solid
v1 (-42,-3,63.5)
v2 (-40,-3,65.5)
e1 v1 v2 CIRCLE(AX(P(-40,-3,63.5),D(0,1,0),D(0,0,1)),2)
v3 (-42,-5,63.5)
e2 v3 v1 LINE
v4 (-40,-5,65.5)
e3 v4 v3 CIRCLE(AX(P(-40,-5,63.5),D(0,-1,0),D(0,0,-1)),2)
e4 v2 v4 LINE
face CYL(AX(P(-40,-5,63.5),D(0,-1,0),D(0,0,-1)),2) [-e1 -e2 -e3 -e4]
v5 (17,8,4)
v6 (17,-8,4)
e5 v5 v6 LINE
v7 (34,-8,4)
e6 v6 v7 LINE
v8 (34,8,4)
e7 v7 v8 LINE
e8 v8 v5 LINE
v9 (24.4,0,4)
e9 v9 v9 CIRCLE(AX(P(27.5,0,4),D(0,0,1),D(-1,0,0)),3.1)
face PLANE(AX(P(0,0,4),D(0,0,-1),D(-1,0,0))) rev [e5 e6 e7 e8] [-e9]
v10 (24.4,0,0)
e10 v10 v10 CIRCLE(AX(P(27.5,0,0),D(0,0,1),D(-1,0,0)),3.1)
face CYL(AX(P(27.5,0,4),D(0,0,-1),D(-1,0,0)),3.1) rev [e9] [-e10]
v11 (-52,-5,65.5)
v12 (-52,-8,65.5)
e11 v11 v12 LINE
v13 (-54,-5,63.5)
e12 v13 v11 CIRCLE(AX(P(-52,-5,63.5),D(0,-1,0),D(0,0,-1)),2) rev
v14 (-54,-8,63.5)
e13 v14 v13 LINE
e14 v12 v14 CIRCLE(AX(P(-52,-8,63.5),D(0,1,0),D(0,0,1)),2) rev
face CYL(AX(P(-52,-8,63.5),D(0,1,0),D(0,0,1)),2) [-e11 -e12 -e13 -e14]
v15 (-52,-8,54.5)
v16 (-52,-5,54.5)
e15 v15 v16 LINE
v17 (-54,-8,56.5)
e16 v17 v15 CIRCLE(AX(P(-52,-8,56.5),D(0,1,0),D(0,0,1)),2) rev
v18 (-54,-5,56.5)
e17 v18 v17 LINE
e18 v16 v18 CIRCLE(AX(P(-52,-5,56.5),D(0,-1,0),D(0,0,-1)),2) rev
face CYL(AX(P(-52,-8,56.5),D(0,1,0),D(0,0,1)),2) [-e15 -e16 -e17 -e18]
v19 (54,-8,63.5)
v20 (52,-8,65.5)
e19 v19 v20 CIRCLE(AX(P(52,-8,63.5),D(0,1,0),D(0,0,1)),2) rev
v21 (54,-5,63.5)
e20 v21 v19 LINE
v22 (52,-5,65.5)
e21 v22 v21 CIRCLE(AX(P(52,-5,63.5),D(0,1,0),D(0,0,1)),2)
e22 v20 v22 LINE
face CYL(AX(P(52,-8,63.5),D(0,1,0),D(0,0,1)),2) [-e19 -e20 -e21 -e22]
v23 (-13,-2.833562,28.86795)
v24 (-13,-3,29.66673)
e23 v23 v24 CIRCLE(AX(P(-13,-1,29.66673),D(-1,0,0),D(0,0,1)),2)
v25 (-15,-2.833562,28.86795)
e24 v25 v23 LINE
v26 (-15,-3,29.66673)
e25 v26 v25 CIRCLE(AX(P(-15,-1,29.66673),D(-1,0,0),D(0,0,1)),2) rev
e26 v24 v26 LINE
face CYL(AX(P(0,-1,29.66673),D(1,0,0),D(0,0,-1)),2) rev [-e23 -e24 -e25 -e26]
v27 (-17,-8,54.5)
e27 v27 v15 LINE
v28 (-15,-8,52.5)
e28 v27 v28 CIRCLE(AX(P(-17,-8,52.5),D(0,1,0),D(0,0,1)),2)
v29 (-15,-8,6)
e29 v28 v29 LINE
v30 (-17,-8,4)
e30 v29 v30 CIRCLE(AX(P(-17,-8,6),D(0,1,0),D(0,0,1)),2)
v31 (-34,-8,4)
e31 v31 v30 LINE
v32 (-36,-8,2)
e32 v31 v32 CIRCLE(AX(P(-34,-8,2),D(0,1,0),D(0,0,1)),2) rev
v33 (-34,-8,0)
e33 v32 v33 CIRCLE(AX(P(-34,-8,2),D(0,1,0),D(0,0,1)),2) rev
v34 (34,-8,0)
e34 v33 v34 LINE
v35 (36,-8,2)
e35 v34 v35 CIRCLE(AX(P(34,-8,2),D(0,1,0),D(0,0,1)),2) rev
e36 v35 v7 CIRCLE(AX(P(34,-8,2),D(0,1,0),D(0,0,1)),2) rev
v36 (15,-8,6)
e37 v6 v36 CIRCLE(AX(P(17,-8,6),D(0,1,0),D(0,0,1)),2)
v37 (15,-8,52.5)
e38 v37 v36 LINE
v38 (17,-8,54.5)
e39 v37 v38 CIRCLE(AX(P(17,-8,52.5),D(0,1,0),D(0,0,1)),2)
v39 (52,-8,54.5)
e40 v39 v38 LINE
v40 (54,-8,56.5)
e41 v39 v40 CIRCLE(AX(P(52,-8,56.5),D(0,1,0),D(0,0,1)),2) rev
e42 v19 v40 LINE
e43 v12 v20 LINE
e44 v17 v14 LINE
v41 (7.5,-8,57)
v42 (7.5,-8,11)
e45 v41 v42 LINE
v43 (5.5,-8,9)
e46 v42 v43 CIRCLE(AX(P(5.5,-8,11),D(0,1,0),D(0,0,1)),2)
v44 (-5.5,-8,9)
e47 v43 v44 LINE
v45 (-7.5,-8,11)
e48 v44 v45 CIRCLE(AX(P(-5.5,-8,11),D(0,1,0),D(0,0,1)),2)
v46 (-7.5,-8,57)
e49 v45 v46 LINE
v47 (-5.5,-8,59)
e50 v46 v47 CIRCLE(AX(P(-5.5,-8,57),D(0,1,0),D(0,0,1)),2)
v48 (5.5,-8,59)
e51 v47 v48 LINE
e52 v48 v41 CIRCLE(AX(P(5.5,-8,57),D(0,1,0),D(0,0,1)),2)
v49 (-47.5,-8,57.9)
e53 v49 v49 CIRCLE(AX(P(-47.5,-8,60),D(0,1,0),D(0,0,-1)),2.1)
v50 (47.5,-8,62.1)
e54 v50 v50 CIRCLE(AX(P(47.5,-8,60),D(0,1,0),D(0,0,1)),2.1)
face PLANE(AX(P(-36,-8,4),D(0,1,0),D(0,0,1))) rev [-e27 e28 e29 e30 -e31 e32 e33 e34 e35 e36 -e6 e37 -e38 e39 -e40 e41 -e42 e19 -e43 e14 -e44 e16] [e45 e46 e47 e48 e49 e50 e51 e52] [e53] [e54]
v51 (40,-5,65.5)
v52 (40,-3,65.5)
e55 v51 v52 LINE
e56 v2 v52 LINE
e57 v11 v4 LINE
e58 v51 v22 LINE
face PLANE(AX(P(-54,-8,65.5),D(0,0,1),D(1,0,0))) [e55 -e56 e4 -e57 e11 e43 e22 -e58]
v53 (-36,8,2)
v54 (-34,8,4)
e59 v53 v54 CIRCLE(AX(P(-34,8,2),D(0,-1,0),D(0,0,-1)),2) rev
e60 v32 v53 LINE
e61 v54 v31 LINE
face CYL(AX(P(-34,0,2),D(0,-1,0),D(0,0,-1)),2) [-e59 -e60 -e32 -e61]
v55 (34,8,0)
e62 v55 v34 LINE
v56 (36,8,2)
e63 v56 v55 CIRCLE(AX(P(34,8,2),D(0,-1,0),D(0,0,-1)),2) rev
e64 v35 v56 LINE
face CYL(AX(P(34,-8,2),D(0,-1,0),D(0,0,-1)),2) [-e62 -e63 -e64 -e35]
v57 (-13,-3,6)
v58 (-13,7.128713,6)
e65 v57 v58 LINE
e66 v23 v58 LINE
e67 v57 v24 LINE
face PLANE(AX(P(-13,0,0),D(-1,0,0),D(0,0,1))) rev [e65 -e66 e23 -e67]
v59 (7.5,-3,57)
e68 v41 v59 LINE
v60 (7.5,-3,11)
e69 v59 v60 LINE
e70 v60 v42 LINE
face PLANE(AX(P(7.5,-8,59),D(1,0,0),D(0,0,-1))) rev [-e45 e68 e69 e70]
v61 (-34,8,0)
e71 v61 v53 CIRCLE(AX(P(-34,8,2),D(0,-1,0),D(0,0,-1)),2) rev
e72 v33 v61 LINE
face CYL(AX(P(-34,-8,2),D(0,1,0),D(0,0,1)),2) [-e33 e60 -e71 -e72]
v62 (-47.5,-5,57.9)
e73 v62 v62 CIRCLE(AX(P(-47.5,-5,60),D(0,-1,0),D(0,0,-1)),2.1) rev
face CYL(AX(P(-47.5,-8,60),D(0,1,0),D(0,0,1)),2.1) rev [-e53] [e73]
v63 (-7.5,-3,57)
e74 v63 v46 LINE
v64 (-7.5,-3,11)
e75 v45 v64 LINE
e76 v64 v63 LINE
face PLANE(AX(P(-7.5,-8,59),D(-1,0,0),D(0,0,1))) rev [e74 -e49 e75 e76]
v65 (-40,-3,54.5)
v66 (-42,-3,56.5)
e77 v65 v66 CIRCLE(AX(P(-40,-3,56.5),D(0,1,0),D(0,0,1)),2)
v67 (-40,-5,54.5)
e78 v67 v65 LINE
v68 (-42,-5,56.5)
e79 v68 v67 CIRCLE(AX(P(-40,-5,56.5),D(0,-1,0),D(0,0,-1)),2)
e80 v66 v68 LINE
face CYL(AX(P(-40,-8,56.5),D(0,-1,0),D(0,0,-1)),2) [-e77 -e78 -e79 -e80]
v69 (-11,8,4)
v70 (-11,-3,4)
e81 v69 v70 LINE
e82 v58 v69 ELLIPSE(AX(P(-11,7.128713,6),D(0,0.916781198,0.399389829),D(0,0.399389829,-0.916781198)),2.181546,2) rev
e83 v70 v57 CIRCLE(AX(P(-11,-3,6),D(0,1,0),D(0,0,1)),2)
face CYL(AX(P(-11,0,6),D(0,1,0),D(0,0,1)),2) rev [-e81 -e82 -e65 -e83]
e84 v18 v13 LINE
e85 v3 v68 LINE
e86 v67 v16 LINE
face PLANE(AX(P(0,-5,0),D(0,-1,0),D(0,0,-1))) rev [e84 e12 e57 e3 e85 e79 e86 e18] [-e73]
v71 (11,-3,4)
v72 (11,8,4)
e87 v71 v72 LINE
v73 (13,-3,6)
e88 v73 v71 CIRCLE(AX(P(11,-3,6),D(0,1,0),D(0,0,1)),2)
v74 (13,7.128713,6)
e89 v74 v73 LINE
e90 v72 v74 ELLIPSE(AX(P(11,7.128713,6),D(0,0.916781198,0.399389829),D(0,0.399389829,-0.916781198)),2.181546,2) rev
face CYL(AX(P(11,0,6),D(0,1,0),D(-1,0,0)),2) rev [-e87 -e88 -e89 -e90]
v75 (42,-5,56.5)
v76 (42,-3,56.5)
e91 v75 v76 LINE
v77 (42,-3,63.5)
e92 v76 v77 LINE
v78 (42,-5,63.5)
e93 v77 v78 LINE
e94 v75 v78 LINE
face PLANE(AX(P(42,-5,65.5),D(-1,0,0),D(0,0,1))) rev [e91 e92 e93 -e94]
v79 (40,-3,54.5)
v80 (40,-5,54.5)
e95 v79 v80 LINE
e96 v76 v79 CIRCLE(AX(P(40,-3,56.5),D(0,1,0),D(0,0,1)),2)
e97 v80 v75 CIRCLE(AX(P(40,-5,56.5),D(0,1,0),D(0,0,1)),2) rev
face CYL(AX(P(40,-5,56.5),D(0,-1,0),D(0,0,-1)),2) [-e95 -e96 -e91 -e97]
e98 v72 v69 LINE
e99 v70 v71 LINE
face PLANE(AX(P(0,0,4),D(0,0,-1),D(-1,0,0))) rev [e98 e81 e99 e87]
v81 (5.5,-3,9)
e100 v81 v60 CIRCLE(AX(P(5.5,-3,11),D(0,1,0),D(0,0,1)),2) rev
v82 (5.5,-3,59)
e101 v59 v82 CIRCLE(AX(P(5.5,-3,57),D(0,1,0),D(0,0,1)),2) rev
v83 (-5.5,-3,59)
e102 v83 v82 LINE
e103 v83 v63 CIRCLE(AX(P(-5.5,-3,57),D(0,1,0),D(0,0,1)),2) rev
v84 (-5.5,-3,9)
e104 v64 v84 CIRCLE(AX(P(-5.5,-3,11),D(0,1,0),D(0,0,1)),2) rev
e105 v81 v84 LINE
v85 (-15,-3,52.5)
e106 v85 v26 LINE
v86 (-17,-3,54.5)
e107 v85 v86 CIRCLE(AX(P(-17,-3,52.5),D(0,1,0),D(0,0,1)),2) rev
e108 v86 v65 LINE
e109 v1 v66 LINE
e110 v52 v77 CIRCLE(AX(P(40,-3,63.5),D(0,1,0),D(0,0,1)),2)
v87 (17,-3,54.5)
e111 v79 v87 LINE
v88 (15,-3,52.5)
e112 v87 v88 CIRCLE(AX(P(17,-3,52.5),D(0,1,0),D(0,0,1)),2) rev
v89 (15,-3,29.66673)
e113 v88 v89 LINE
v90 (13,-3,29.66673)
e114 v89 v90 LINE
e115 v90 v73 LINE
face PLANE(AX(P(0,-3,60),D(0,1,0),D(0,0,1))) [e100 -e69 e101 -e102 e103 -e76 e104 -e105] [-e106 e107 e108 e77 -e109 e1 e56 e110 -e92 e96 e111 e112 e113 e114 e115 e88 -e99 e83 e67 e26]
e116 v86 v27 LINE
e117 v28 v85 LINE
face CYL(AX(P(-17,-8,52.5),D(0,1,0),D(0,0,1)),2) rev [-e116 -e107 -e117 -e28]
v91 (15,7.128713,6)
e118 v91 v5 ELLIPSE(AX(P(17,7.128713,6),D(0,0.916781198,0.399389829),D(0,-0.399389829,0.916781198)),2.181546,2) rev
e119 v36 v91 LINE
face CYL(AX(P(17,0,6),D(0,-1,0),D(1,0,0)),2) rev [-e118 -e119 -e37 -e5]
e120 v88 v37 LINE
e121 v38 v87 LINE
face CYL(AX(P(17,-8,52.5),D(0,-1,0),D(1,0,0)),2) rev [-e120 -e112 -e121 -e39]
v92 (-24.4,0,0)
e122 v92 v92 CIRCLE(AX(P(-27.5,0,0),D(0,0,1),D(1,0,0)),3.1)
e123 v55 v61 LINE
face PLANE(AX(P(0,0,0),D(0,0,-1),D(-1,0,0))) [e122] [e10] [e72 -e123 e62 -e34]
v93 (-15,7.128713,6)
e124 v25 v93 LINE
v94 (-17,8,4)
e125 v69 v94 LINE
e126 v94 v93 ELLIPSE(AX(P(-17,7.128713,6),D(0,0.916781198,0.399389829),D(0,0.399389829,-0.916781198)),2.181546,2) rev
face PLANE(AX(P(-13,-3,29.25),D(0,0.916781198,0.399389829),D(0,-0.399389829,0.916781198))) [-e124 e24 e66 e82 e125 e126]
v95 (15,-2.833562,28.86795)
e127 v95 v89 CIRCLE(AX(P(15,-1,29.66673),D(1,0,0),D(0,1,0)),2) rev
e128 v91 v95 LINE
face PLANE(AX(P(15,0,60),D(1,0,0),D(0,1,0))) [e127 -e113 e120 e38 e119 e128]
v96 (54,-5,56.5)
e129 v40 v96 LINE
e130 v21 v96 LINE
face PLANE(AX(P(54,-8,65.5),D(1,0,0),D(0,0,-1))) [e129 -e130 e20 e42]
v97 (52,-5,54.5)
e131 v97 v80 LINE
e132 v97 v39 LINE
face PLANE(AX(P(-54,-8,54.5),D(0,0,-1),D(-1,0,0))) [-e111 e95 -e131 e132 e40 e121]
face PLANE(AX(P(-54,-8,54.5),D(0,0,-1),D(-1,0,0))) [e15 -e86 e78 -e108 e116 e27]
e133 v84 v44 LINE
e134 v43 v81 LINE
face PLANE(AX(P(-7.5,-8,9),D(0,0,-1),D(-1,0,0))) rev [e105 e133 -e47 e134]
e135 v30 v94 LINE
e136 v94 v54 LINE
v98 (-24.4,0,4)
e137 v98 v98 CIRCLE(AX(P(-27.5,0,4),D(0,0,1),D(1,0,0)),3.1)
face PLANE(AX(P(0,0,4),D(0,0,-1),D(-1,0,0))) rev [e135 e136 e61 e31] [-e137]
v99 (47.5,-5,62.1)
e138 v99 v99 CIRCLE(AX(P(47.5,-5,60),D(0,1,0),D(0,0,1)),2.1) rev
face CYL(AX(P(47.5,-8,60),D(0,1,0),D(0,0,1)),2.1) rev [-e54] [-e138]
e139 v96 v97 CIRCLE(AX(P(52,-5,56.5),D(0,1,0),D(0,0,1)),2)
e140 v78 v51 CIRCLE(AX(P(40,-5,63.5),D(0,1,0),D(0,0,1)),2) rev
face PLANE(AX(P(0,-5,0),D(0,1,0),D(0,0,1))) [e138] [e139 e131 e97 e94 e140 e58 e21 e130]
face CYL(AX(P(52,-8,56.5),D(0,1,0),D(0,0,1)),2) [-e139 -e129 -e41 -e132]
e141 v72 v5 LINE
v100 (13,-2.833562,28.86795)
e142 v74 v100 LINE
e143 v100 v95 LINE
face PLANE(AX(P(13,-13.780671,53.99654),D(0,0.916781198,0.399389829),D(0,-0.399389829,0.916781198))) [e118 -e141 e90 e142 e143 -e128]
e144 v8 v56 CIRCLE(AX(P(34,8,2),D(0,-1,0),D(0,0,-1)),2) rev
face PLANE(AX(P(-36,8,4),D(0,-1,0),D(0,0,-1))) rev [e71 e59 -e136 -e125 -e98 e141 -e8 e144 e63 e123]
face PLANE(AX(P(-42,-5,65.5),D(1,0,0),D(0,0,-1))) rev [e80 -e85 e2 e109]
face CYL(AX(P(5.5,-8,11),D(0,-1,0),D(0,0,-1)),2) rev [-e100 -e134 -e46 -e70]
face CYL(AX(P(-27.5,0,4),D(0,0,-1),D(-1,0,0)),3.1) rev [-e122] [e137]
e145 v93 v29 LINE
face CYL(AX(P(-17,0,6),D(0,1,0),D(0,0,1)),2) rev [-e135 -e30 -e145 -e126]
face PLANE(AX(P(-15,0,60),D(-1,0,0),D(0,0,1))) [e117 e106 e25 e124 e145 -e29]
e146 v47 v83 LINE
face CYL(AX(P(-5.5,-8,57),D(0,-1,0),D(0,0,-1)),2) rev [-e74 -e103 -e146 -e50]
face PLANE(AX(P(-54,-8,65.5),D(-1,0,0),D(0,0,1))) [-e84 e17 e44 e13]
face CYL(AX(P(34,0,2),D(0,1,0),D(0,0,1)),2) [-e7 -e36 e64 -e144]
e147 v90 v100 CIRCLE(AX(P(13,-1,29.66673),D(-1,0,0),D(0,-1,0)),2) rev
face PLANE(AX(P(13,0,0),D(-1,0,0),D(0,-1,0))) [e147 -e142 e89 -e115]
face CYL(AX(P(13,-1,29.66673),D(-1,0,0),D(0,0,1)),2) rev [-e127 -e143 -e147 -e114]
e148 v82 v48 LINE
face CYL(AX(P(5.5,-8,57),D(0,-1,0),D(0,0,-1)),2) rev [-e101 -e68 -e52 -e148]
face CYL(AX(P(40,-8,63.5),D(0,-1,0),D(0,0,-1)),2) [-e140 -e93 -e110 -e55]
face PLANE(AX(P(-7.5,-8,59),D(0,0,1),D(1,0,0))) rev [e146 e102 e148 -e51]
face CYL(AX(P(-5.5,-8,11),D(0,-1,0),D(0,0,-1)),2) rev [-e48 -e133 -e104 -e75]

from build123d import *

# Parameters (mm, degrees)
SKETCH_1_W          = 72
SKETCH_1_H          = 16
SKETCH_1_R          = 3.1
EXTRUDE_1_DEPTH     = 4
EXTRUDE_START       = -4
SKETCH_3_W          = 30
SKETCH_3_H          = 5
EXTRUDE_2_DEPTH     = 60
SKETCH_5_W          = 108
SKETCH_5_H          = 11
SKETCH_5_R          = 2.1
EXTRUDE_3_DEPTH     = 5
SKETCH_6_W          = 12
SKETCH_6_H          = 11
CUT_EXTRUDE_1_DEPTH = 2
SKETCH_7_W          = 15
SKETCH_7_H          = 50
CUT_EXTRUDE_2_DEPTH = 86.599357474
EXTRUDE_4_DEPTH     = 2
EXTRUDE_START_2     = -30
EXTRUDE_5_DEPTH     = 2
FILLET_1_R          = 2


with BuildPart() as part:
    # 草图1 → 凸台-拉伸1 (new body)
    with BuildSketch(Plane.XY):
        Rectangle(SKETCH_1_W, SKETCH_1_H)
        with Locations((-27.5, 0)):
            Circle(SKETCH_1_R, mode=Mode.SUBTRACT)
        with Locations(Location((27.5, 0, 0), (0, 0, 180))):
            Circle(SKETCH_1_R, mode=Mode.SUBTRACT)
    extrude(amount=EXTRUDE_1_DEPTH)

    # 草图3 → 凸台-拉伸2 (add)
    with BuildSketch(Plane.XY.offset(4).offset(EXTRUDE_START)):
        with Locations((0, -5.5)):
            Rectangle(SKETCH_3_W, SKETCH_3_H)
    extrude(amount=EXTRUDE_2_DEPTH)

    # 草图5 → 凸台-拉伸3 (add, through all)
    with BuildSketch(Plane(origin=(0, -3, 0), x_dir=(1, 0, 0), z_dir=(0, 1, 0))):
        with Locations((0, -60)):
            Rectangle(SKETCH_5_W, SKETCH_5_H)
        with Locations(Location((47.5, -60, 0), (0, 0, 270))):
            Circle(SKETCH_5_R, mode=Mode.SUBTRACT)
        with Locations(Location((-47.5, -60, 0), (0, 0, 90))):
            Circle(SKETCH_5_R, mode=Mode.SUBTRACT)
    extrude(amount=-EXTRUDE_3_DEPTH)

    # 草图6 → 切除-拉伸1 (cut)
    with BuildSketch(Plane(origin=(0, -3, 0), x_dir=(1, 0, 0), z_dir=(0, 1, 0))):
        with Locations((-48, -60)):
            Rectangle(SKETCH_6_W, SKETCH_6_H)
        with Locations((48, -60)):
            Rectangle(SKETCH_6_W, SKETCH_6_H)
    extrude(amount=-CUT_EXTRUDE_1_DEPTH, mode=Mode.SUBTRACT)

    # 草图7 → 切除-拉伸2 (cut, through all)
    with BuildSketch(Plane(origin=(0, -3, 0), x_dir=(1, 0, 0), z_dir=(0, 1, 0))):
        with Locations((0, -34)):
            Rectangle(SKETCH_7_W, SKETCH_7_H)
    extrude(amount=-CUT_EXTRUDE_2_DEPTH, mode=Mode.SUBTRACT)

    # 草图8 → 凸台-拉伸4 (add)
    with BuildSketch(Plane.ZY.offset(15)):
        Polygon((4, -3), (29.25, -3), (4, 8), align=None)
    extrude(amount=-EXTRUDE_4_DEPTH)

    # 草图8<2> → 凸台-拉伸5 (add)
    with BuildSketch(Plane.ZY.offset(15).offset(EXTRUDE_START_2)):
        Polygon((4, -3), (29.25, -3), (4, 8), align=None)
    extrude(amount=EXTRUDE_5_DEPTH)

    # 圆角1
    fillet_1_edges = [part.edges().sort_by_distance(p)[0] for p in [
        (15, 0, 4),
        (36, 0, 4),
        (36, 0, 0),
        (-36, 0, 0),
        (-36, 0, 4),
        (-15, -5.5, 54.5),
        (-54, -6.5, 54.5),
        (-54, -6.5, 65.5),
        (54, -6.5, 65.5),
        (54, -6.5, 54.5),
        (15, -5.5, 54.5),
        (-15, 0, 4),
        (-42, -4, 54.5),
        (42, -4, 54.5),
        (42, -4, 65.5),
        (-42, -4, 65.5),
        (-7.5, -5.5, 59),
        (-7.5, -5.5, 9),
        (7.5, -5.5, 59),
        (7.5, -5.5, 9),
        (14, -3, 29.25),
        (-14, -3, 29.25),
        (-13, 2.5, 4),
        (13, 2.5, 4),
    ]]
    fillet(fillet_1_edges, radius=FILLET_1_R - 0.0001)  # a hair under: the kernel refuses the full size


solid = part.part
